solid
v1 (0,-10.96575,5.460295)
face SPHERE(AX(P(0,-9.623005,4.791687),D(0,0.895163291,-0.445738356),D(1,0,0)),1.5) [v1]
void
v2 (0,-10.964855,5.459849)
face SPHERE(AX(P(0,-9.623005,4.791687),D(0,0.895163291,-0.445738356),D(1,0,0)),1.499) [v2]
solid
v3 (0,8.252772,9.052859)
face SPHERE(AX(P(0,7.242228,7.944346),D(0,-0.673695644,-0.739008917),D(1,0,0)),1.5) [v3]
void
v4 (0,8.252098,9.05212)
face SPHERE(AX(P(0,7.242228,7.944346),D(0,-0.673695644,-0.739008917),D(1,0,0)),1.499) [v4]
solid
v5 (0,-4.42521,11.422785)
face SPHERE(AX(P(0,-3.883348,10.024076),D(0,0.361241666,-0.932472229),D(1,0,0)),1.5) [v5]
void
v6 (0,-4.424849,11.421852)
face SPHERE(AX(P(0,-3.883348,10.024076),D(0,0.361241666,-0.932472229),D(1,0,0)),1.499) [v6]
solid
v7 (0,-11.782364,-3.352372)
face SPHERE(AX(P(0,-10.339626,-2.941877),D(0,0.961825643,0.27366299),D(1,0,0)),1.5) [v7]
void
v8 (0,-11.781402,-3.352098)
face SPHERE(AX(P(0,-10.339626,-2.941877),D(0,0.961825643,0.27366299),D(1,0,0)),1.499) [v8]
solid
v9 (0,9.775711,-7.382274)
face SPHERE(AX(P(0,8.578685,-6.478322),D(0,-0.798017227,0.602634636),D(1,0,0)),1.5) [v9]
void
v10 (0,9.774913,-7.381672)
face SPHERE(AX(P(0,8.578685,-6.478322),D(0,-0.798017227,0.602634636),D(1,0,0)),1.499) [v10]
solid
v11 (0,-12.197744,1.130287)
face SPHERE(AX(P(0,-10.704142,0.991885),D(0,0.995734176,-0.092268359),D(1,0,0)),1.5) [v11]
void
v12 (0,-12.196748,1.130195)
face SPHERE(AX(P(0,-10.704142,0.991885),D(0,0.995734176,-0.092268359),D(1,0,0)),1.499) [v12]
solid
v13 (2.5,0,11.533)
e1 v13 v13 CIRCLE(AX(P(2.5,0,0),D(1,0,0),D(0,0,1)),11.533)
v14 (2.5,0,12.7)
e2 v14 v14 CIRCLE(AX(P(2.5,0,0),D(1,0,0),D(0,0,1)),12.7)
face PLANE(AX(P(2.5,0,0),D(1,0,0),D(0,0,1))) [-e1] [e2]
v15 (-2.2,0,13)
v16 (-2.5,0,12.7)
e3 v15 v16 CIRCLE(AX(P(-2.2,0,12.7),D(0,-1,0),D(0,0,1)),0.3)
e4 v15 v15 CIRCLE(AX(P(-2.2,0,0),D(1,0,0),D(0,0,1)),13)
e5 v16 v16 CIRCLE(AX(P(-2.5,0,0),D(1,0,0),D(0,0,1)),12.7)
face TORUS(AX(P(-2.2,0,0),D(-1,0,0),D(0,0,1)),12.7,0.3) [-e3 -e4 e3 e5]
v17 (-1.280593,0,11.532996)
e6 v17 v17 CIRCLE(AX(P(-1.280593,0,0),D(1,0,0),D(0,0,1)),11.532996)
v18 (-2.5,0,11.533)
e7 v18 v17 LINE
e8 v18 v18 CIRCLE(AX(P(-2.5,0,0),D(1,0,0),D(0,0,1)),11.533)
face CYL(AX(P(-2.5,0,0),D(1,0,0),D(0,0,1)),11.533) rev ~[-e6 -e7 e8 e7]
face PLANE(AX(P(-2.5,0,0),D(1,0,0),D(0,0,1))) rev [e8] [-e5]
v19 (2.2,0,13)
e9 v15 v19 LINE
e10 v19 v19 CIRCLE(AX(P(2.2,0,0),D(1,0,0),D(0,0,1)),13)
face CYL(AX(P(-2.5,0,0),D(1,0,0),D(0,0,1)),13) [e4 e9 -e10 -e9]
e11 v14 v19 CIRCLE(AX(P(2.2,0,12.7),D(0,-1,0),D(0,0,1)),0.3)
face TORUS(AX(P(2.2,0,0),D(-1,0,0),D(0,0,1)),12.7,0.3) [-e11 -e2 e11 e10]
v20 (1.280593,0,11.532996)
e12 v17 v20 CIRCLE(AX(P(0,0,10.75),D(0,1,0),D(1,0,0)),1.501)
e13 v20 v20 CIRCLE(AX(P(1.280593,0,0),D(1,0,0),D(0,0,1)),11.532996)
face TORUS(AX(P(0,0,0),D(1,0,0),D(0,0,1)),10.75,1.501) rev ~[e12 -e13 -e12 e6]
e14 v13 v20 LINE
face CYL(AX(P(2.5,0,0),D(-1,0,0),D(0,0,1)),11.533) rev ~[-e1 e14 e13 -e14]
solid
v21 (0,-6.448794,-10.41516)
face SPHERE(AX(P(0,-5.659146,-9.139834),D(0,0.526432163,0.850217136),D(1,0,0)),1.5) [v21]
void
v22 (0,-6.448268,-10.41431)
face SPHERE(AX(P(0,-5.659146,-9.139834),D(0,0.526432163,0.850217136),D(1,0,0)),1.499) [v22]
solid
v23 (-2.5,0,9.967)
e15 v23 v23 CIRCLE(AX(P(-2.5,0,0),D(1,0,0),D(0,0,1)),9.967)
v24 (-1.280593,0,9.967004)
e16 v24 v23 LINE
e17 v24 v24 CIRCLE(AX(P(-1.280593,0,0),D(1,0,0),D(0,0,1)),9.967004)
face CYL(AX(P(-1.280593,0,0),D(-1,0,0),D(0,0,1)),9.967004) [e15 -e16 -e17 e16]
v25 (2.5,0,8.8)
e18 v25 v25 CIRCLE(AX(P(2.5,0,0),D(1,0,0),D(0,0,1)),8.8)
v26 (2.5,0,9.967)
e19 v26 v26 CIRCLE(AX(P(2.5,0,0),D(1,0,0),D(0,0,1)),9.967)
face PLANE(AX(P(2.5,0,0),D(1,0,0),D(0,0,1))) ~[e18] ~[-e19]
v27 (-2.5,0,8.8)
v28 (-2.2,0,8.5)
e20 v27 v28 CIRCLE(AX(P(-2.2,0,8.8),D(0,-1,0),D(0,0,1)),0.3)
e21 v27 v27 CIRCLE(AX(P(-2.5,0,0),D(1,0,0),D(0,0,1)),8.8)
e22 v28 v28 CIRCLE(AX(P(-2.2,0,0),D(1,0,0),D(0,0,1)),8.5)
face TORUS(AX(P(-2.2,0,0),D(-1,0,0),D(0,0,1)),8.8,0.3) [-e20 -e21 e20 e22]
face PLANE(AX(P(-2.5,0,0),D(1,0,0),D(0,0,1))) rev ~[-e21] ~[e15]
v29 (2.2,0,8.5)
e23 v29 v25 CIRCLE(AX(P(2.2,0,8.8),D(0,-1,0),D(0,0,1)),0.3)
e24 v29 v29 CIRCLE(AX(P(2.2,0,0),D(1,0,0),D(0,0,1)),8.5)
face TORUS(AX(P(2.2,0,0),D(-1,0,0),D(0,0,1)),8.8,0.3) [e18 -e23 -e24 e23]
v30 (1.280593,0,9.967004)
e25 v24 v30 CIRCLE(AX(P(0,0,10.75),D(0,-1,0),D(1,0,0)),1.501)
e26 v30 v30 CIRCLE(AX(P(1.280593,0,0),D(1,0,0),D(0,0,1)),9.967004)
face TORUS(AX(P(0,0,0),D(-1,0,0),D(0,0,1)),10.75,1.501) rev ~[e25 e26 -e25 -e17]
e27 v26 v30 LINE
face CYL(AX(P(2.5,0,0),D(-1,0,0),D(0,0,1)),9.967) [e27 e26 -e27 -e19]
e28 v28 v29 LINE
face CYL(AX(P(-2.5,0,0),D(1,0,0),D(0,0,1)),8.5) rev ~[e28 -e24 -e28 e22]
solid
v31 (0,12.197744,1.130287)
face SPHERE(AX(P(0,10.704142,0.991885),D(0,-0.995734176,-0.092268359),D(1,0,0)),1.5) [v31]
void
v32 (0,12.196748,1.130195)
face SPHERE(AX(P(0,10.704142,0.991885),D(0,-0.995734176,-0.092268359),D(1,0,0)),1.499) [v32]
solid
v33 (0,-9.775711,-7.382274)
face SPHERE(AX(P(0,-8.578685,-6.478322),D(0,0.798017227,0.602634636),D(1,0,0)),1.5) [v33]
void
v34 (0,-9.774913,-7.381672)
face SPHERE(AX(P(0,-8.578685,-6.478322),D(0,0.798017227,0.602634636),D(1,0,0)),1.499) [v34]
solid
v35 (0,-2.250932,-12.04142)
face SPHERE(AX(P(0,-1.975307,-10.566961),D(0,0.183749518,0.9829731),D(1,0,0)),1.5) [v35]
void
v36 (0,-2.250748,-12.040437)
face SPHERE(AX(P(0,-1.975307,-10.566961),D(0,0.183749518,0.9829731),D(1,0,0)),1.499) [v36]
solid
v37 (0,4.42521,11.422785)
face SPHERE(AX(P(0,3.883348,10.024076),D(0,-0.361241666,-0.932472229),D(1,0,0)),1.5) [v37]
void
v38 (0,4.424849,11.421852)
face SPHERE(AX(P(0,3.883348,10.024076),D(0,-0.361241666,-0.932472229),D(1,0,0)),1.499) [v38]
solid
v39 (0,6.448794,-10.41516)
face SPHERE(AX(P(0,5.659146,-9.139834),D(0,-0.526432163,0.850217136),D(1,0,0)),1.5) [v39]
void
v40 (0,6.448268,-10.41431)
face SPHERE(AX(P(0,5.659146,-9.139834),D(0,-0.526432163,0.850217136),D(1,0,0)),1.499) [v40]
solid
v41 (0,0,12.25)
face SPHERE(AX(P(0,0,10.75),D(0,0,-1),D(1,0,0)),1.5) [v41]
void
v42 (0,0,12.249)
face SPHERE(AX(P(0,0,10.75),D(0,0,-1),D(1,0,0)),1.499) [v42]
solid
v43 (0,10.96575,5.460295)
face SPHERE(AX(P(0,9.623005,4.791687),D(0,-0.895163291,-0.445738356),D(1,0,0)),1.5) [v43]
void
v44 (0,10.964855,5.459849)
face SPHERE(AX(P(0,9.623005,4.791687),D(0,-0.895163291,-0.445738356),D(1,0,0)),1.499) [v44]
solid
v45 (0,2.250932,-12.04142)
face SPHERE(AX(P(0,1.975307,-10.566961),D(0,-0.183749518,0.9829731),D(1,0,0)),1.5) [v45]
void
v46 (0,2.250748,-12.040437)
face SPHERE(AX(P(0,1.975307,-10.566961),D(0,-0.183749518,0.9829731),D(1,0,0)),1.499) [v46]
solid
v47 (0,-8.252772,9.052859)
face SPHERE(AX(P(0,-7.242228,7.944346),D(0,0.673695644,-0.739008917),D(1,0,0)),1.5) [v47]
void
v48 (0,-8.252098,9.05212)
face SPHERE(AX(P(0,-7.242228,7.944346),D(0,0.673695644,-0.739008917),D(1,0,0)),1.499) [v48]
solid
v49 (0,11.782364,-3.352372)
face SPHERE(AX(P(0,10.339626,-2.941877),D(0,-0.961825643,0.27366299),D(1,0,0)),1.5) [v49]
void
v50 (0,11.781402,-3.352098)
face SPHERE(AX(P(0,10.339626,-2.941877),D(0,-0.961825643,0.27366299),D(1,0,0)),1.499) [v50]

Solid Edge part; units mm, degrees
sketch "Sketch1" plane through (0, 0, 0) normal (0, -1, 0) x (1, 0, 0)
  arc A0 (0, 12.25) -> (0, 9.25) centre (0, 10.75) cw
  dimension "D1" = 1.5
revolve "RevolvedProtrusion1" add sketch "Sketch1" angle 360 about axis through (0, 0, 30.6346) along (0, 0, 1)
shell "Thinwall1" thickness 0.001 removed faces 0
pattern_circular "Pattern1" count 17 over 360 about axis through (0, 0, 0) along (1, 0, 0) of "RevolvedProtrusion1", "Thinwall1"
sketch "Sketch2" plane through (0, 0, 0) normal (0, -1, 0) x (1, 0, 0)
  line L0 (-2.5, 9.967) -> (-2.5, 8.5)
  line L1 (-2.5, 8.5) -> (2.5, 8.5)
  line L2 (2.5, 8.5) -> (2.5, 9.967)
  line L3 (2.5, 9.967) -> (1.2806, 9.967)
  arc A0 (-1.2806, 9.967) -> (1.2806, 9.967) centre (0, 10.75) ccw
  line L4 (-1.2806, 9.967) -> (-2.5, 9.967)
  line L5 (-2.5, 11.533) -> (-1.2806, 11.533)
  arc A1 (-1.2806, 11.533) -> (1.2806, 11.533) centre (0, 10.75) cw
  line L6 (2.5, 11.533) -> (1.2806, 11.533)
  line L7 (2.5, 13) -> (2.5, 11.533)
  line L8 (-2.5, 13) -> (2.5, 13)
  line L9 (-2.5, 11.533) -> (-2.5, 13)
  dimension "D1" = 5
  dimension "D2" = 1.501
  dimension "D3" = 1.501
revolve "RevolvedProtrusion2" add sketch "Sketch2" angle 360 about axis through (-60, 0, 0) along (1, 0, 0)
fillet "Round1" radius 0.3 4 edges at (-2.5, 0, -13) (2.5, 0, -13) (2.5, 0, -8.5) (-2.5, 0, -8.5)
properties material "Stahl"
